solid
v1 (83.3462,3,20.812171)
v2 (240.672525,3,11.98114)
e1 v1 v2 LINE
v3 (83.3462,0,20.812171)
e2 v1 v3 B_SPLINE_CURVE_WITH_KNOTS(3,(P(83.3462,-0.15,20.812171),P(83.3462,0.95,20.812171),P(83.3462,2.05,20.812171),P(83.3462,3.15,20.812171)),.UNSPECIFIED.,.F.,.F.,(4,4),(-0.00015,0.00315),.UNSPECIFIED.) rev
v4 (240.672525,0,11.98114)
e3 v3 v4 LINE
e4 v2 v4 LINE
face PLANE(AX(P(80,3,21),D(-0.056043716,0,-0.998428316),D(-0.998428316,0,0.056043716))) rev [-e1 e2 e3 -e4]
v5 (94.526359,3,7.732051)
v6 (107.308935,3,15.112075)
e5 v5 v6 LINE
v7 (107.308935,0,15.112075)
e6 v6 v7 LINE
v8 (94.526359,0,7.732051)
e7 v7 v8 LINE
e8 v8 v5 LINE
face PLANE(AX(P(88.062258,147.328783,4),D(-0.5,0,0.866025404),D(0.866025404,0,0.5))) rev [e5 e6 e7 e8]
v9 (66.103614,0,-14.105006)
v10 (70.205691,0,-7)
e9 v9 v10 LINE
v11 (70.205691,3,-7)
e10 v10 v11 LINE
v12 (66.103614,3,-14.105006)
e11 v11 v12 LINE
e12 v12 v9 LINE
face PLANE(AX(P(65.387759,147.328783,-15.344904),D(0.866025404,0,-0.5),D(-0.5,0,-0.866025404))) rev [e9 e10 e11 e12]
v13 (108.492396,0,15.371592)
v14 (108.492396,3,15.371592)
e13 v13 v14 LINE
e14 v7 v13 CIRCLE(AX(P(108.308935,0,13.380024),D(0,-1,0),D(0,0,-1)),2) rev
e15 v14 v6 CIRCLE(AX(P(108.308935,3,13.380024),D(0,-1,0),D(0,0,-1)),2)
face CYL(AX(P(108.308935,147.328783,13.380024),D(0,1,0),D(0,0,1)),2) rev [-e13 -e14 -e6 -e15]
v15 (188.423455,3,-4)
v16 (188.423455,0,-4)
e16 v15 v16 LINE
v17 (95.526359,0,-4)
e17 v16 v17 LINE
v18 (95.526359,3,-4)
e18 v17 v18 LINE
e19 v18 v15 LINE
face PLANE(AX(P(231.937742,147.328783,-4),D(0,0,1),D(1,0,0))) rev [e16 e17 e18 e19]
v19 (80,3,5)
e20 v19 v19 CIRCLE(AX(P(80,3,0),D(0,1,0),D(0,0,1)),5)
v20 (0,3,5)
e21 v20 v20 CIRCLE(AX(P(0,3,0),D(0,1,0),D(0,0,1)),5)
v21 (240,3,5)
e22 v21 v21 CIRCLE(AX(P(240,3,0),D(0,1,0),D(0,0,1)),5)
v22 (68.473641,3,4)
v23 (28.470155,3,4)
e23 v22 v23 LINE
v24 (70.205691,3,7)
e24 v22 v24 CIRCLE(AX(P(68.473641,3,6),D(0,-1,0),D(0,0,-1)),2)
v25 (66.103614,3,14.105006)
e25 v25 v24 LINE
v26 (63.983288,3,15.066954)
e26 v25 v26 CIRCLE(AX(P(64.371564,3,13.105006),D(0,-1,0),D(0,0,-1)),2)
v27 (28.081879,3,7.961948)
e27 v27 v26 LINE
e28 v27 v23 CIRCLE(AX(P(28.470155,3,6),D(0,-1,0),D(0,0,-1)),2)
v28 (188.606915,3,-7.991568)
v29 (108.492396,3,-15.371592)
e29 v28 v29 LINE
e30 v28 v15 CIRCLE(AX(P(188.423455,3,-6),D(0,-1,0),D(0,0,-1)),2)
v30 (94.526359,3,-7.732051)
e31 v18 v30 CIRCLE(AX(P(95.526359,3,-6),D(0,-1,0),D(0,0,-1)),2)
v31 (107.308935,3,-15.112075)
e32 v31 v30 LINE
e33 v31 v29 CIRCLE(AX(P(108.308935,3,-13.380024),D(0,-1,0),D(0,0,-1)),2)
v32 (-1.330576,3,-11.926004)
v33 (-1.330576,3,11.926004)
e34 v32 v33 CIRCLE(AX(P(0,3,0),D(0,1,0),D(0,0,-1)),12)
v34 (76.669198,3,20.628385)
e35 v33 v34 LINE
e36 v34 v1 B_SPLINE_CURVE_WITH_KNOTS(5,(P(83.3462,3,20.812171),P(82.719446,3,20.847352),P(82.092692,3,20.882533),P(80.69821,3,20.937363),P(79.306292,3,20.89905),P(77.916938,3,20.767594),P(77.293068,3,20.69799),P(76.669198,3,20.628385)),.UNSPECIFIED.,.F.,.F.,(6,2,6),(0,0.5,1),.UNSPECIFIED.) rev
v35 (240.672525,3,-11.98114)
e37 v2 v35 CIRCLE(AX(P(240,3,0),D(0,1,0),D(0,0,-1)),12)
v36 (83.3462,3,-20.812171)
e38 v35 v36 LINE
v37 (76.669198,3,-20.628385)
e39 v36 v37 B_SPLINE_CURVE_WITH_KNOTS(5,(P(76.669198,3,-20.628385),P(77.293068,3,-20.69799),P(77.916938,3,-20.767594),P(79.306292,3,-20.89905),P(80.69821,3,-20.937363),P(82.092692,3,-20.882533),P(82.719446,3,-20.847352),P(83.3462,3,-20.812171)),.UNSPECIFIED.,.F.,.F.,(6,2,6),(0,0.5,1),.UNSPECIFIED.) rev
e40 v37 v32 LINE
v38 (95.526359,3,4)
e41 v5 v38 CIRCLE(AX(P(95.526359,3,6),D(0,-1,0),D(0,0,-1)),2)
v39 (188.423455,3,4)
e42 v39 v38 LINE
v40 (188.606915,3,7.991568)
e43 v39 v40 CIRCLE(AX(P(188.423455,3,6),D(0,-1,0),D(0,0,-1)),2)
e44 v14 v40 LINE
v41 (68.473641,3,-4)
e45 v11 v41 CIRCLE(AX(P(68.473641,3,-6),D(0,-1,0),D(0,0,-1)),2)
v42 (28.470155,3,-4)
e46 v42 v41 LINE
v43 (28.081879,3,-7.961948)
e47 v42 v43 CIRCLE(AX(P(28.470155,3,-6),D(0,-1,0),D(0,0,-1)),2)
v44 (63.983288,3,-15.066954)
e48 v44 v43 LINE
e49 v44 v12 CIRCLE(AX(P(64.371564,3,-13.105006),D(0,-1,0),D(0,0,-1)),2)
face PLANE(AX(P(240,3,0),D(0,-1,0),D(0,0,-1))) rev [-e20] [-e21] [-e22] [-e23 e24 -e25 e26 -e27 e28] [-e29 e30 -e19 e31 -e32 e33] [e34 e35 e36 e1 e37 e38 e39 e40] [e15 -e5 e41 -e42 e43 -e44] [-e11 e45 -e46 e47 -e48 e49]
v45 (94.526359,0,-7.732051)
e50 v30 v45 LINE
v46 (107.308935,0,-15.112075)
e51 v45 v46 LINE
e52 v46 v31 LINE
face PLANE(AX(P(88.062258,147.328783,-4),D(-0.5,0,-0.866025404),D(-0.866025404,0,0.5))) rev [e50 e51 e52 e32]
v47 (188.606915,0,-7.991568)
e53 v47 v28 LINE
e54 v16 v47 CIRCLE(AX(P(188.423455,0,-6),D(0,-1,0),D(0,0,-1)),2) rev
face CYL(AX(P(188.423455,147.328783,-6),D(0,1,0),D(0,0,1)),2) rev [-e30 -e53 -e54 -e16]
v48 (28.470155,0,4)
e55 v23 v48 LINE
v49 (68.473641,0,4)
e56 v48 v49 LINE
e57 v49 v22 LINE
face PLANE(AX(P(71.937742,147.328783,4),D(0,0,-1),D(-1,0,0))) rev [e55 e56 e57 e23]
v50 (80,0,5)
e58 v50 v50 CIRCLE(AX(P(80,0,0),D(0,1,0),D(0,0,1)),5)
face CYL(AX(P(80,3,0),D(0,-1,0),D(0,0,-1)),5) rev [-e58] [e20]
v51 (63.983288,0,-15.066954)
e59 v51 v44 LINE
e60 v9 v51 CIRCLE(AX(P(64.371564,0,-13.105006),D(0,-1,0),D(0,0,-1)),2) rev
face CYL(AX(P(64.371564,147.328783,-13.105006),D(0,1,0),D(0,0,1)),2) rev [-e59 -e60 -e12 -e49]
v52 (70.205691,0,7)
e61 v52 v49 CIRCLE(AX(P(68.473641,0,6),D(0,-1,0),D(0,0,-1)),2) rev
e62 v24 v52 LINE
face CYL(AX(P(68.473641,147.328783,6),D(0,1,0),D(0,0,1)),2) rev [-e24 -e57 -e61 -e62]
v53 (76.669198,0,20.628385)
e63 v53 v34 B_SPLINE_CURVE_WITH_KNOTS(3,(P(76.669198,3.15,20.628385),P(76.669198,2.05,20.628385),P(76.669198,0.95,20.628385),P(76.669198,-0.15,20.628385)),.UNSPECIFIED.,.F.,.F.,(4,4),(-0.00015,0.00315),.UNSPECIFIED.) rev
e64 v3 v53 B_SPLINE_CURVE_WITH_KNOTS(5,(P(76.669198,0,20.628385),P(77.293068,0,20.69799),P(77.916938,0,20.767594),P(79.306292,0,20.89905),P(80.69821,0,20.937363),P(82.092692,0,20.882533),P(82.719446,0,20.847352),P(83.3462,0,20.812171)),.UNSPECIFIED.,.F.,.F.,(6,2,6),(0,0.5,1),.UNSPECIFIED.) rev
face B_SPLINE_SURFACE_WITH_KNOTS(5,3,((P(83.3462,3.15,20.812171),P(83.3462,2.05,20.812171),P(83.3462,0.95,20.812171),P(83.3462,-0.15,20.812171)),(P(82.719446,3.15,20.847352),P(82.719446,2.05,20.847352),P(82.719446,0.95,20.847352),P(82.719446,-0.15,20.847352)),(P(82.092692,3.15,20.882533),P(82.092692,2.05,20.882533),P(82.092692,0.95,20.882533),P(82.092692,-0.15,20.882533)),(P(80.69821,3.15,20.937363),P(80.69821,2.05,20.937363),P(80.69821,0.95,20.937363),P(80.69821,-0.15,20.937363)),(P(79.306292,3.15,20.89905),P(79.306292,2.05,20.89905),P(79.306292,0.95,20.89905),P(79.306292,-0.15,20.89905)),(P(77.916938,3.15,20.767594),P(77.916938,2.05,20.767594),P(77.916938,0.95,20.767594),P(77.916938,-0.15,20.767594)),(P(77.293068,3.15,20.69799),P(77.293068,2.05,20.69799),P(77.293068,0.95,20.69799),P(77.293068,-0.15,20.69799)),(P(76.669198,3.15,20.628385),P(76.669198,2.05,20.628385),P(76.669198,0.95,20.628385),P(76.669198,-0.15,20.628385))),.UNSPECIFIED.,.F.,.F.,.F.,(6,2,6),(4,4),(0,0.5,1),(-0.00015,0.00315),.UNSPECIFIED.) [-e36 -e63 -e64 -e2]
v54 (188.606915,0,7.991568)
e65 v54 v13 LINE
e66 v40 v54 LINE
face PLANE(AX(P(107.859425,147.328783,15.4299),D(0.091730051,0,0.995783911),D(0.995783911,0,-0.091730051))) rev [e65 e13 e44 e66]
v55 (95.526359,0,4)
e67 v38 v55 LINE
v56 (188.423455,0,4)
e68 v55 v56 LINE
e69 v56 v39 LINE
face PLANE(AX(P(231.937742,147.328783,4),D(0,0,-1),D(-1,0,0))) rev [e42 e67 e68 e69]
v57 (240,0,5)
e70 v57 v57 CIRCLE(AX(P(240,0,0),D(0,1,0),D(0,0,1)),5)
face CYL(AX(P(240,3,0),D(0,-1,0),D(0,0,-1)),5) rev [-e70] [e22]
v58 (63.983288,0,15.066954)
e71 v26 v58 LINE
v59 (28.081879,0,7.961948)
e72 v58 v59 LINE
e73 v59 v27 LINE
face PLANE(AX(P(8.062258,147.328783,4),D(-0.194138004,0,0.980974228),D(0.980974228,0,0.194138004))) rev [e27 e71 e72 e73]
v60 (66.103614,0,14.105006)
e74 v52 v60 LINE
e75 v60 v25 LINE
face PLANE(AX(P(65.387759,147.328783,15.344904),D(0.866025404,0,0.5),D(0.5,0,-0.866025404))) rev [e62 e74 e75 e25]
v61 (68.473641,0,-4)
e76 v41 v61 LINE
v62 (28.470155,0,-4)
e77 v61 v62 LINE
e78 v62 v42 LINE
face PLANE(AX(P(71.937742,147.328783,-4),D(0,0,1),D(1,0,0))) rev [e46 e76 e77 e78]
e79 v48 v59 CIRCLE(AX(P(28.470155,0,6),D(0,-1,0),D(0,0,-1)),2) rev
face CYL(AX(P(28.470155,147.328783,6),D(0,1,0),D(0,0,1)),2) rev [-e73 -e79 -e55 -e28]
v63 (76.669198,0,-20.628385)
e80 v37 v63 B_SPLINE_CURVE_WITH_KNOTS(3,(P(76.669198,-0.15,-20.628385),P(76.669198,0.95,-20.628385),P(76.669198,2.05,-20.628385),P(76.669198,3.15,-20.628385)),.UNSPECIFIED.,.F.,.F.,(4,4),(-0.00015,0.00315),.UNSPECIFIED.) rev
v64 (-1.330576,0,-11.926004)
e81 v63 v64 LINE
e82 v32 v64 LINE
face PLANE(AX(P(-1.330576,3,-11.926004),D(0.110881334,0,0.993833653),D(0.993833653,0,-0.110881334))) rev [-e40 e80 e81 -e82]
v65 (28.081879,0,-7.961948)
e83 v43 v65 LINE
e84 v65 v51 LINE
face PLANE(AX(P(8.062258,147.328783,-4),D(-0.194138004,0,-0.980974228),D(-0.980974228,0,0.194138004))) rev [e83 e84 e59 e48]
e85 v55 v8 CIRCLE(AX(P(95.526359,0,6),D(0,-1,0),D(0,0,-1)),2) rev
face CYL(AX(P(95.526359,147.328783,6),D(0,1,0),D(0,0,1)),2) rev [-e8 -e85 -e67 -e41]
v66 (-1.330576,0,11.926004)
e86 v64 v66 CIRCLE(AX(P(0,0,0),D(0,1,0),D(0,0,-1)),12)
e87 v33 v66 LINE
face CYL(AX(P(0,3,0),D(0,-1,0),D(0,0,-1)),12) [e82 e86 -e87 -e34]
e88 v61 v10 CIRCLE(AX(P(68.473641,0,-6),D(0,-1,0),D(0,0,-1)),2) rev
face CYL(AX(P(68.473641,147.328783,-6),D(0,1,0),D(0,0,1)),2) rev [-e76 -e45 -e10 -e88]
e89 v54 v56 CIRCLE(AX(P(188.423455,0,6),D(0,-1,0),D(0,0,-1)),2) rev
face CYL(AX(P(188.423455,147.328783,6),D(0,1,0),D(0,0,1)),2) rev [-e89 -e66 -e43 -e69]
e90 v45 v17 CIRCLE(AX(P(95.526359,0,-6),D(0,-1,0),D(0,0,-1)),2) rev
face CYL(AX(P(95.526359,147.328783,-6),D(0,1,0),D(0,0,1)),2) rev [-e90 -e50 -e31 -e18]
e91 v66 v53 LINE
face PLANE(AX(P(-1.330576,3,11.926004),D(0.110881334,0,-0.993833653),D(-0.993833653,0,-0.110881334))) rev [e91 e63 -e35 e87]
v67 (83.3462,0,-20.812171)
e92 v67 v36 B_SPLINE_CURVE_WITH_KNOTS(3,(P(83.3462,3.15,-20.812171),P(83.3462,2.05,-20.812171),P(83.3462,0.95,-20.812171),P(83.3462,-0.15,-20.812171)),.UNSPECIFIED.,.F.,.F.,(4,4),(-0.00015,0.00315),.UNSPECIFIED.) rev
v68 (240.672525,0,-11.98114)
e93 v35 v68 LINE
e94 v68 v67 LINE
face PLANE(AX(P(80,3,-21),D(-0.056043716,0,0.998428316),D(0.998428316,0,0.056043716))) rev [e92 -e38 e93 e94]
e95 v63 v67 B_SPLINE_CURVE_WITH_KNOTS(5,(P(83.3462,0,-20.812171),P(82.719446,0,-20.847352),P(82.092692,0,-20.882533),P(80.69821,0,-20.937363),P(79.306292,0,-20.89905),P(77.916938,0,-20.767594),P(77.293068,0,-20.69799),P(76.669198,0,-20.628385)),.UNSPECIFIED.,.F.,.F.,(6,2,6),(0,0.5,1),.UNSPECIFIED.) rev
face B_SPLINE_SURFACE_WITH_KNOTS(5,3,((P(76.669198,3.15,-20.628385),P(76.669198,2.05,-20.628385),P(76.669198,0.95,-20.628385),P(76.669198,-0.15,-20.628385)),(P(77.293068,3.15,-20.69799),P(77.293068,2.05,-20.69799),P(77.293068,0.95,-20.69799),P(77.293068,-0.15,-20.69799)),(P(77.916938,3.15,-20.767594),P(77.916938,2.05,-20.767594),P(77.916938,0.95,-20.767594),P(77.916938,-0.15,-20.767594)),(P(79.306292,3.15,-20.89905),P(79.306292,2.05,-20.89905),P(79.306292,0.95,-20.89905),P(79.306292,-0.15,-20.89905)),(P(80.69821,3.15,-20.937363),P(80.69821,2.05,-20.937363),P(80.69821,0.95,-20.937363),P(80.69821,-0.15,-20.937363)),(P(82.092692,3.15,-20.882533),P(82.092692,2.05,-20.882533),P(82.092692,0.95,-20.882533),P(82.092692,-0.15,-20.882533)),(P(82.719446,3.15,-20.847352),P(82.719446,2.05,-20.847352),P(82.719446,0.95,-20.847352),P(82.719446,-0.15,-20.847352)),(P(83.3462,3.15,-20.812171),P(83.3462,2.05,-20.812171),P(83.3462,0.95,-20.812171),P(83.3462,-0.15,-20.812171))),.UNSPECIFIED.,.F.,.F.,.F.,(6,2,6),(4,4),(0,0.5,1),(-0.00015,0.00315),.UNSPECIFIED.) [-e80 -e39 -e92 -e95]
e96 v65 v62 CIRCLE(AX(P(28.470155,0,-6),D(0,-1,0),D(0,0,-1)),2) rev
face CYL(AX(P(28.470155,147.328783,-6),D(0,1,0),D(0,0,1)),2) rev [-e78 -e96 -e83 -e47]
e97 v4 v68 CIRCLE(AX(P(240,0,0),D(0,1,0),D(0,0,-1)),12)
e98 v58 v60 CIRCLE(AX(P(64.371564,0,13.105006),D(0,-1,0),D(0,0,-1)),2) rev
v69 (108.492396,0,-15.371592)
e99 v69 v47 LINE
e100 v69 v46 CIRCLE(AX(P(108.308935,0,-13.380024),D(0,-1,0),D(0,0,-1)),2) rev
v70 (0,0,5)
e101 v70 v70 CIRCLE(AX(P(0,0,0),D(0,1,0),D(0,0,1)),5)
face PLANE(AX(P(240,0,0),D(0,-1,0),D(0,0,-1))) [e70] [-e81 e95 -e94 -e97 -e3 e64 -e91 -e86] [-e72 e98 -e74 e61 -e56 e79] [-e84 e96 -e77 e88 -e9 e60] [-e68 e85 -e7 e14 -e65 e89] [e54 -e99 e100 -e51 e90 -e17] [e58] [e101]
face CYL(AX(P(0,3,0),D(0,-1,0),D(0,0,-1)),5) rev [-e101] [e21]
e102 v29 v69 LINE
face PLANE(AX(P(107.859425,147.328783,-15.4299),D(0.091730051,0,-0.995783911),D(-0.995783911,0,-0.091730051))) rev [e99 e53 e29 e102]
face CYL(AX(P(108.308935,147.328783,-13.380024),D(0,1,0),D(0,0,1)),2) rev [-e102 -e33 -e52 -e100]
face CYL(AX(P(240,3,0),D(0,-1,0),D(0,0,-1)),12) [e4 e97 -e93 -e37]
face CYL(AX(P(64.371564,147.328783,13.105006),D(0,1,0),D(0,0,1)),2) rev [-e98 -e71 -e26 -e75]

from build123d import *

# Parameters (mm, degrees)
SKETCH_1_R          = 5
EXTRUDE_1_DEPTH     = 3
CUT_EXTRUDE_1_DEPTH = 3
FILLET_2_R          = 2


with BuildPart() as part:
    # 草图1 → 凸台-拉伸1 (new body)
    with BuildSketch(Plane(origin=(0, 0, 0), x_dir=(1, 0, 0), z_dir=(0, 1, 0))):
        with BuildLine():
            Line((-1.330576007, 11.926003836), (80, 21))
            Line((80, 21), (240.672524597, 11.98113979))
            ThreePointArc((240.672524597, 11.98113979), (252, 0), (240.672524597, -11.98113979))
            Line((240.672524597, -11.98113979), (80, -21))
            Line((80, -21), (-1.330576007, -11.926003836))
            ThreePointArc((-1.330576007, -11.926003836), (-12, 0), (-1.330576007, 11.926003836))
        make_face()
        with Locations(Location((0, 0, 0), (0, 0, 270))):
            Circle(SKETCH_1_R, mode=Mode.SUBTRACT)
        with Locations(Location((80, 0, 0), (0, 0, 270))):
            Circle(SKETCH_1_R, mode=Mode.SUBTRACT)
        with Locations(Location((240, 0, 0), (0, 0, 270))):
            Circle(SKETCH_1_R, mode=Mode.SUBTRACT)
    extrude(amount=EXTRUDE_1_DEPTH)

    # 圆角1
    # a fillet whose section is not a circle: 40 mm, written as the material it takes off along each edge
    with BuildSketch(Plane(origin=(80, -8.378669722, 21), x_dir=(0.9984283158275346, 0, -0.0560437164523641), z_dir=(0, 1, 0)), Plane(origin=(80, -8.378669722, -21), x_dir=(-0.9938336529777407, 0, 0.1108813339066567), z_dir=(0, 1, 0))) as fillet_1_piece_1:
        with BuildLine():
            add(Edge.make_bspline([(3.351467889, 0), (2.723727072, 0), (2.095986256, 0), (0.700623386, 0.02340826), (-0.686959659, 0.139669261), (-2.06676288, 0.348783001), (-2.685751394, 0.453242334), (-3.304739908, 0.557701667)], knots=[0, 0, 0, 0, 0, 0, 0.5, 0.5, 1, 1, 1, 1, 1, 1], degree=5))
            Line((-3.304739908, 0.557701667), (0, 0))
            Line((0, 0), (3.351467889, 0))
        make_face()
    extrude(amount=19.757339444, mode=Mode.SUBTRACT)

    # 草图2 → 切除-拉伸1 (cut)
    with BuildSketch(Plane.XZ):
        Polygon((8.062257748, 4), (65.387758913, 15.344903932), (71.937742252, 4), align=None)
        Polygon((88.062257748, 4), (107.859425007, 15.429899846), (231.937742252, 4), align=None)
        Polygon((107.859425007, -15.429899846), (231.937742252, -4), (88.062257748, -4), align=None)
        Polygon((65.387758913, -15.344903932), (71.937742252, -4), (8.062257748, -4), align=None)
    extrude(amount=-CUT_EXTRUDE_1_DEPTH, mode=Mode.SUBTRACT)

    # 圆角2
    fillet_2_edges = [part.edges().sort_by_distance(p)[0] for p in [
        (65.387758913, 1.5, -15.344903932),
        (8.062257748, 1.5, -4),
        (71.937742252, 1.5, -4),
        (107.859425007, 1.5, -15.429899846),
        (88.062257748, 1.5, -4),
        (231.937742252, 1.5, -4),
        (231.937742252, 1.5, 4),
        (88.062257748, 1.5, 4),
        (107.859425007, 1.5, 15.429899846),
        (71.937742252, 1.5, 4),
        (8.062257748, 1.5, 4),
        (65.387758913, 1.5, 15.344903932),
    ]]
    fillet(fillet_2_edges, radius=FILLET_2_R)


solid = part.part
